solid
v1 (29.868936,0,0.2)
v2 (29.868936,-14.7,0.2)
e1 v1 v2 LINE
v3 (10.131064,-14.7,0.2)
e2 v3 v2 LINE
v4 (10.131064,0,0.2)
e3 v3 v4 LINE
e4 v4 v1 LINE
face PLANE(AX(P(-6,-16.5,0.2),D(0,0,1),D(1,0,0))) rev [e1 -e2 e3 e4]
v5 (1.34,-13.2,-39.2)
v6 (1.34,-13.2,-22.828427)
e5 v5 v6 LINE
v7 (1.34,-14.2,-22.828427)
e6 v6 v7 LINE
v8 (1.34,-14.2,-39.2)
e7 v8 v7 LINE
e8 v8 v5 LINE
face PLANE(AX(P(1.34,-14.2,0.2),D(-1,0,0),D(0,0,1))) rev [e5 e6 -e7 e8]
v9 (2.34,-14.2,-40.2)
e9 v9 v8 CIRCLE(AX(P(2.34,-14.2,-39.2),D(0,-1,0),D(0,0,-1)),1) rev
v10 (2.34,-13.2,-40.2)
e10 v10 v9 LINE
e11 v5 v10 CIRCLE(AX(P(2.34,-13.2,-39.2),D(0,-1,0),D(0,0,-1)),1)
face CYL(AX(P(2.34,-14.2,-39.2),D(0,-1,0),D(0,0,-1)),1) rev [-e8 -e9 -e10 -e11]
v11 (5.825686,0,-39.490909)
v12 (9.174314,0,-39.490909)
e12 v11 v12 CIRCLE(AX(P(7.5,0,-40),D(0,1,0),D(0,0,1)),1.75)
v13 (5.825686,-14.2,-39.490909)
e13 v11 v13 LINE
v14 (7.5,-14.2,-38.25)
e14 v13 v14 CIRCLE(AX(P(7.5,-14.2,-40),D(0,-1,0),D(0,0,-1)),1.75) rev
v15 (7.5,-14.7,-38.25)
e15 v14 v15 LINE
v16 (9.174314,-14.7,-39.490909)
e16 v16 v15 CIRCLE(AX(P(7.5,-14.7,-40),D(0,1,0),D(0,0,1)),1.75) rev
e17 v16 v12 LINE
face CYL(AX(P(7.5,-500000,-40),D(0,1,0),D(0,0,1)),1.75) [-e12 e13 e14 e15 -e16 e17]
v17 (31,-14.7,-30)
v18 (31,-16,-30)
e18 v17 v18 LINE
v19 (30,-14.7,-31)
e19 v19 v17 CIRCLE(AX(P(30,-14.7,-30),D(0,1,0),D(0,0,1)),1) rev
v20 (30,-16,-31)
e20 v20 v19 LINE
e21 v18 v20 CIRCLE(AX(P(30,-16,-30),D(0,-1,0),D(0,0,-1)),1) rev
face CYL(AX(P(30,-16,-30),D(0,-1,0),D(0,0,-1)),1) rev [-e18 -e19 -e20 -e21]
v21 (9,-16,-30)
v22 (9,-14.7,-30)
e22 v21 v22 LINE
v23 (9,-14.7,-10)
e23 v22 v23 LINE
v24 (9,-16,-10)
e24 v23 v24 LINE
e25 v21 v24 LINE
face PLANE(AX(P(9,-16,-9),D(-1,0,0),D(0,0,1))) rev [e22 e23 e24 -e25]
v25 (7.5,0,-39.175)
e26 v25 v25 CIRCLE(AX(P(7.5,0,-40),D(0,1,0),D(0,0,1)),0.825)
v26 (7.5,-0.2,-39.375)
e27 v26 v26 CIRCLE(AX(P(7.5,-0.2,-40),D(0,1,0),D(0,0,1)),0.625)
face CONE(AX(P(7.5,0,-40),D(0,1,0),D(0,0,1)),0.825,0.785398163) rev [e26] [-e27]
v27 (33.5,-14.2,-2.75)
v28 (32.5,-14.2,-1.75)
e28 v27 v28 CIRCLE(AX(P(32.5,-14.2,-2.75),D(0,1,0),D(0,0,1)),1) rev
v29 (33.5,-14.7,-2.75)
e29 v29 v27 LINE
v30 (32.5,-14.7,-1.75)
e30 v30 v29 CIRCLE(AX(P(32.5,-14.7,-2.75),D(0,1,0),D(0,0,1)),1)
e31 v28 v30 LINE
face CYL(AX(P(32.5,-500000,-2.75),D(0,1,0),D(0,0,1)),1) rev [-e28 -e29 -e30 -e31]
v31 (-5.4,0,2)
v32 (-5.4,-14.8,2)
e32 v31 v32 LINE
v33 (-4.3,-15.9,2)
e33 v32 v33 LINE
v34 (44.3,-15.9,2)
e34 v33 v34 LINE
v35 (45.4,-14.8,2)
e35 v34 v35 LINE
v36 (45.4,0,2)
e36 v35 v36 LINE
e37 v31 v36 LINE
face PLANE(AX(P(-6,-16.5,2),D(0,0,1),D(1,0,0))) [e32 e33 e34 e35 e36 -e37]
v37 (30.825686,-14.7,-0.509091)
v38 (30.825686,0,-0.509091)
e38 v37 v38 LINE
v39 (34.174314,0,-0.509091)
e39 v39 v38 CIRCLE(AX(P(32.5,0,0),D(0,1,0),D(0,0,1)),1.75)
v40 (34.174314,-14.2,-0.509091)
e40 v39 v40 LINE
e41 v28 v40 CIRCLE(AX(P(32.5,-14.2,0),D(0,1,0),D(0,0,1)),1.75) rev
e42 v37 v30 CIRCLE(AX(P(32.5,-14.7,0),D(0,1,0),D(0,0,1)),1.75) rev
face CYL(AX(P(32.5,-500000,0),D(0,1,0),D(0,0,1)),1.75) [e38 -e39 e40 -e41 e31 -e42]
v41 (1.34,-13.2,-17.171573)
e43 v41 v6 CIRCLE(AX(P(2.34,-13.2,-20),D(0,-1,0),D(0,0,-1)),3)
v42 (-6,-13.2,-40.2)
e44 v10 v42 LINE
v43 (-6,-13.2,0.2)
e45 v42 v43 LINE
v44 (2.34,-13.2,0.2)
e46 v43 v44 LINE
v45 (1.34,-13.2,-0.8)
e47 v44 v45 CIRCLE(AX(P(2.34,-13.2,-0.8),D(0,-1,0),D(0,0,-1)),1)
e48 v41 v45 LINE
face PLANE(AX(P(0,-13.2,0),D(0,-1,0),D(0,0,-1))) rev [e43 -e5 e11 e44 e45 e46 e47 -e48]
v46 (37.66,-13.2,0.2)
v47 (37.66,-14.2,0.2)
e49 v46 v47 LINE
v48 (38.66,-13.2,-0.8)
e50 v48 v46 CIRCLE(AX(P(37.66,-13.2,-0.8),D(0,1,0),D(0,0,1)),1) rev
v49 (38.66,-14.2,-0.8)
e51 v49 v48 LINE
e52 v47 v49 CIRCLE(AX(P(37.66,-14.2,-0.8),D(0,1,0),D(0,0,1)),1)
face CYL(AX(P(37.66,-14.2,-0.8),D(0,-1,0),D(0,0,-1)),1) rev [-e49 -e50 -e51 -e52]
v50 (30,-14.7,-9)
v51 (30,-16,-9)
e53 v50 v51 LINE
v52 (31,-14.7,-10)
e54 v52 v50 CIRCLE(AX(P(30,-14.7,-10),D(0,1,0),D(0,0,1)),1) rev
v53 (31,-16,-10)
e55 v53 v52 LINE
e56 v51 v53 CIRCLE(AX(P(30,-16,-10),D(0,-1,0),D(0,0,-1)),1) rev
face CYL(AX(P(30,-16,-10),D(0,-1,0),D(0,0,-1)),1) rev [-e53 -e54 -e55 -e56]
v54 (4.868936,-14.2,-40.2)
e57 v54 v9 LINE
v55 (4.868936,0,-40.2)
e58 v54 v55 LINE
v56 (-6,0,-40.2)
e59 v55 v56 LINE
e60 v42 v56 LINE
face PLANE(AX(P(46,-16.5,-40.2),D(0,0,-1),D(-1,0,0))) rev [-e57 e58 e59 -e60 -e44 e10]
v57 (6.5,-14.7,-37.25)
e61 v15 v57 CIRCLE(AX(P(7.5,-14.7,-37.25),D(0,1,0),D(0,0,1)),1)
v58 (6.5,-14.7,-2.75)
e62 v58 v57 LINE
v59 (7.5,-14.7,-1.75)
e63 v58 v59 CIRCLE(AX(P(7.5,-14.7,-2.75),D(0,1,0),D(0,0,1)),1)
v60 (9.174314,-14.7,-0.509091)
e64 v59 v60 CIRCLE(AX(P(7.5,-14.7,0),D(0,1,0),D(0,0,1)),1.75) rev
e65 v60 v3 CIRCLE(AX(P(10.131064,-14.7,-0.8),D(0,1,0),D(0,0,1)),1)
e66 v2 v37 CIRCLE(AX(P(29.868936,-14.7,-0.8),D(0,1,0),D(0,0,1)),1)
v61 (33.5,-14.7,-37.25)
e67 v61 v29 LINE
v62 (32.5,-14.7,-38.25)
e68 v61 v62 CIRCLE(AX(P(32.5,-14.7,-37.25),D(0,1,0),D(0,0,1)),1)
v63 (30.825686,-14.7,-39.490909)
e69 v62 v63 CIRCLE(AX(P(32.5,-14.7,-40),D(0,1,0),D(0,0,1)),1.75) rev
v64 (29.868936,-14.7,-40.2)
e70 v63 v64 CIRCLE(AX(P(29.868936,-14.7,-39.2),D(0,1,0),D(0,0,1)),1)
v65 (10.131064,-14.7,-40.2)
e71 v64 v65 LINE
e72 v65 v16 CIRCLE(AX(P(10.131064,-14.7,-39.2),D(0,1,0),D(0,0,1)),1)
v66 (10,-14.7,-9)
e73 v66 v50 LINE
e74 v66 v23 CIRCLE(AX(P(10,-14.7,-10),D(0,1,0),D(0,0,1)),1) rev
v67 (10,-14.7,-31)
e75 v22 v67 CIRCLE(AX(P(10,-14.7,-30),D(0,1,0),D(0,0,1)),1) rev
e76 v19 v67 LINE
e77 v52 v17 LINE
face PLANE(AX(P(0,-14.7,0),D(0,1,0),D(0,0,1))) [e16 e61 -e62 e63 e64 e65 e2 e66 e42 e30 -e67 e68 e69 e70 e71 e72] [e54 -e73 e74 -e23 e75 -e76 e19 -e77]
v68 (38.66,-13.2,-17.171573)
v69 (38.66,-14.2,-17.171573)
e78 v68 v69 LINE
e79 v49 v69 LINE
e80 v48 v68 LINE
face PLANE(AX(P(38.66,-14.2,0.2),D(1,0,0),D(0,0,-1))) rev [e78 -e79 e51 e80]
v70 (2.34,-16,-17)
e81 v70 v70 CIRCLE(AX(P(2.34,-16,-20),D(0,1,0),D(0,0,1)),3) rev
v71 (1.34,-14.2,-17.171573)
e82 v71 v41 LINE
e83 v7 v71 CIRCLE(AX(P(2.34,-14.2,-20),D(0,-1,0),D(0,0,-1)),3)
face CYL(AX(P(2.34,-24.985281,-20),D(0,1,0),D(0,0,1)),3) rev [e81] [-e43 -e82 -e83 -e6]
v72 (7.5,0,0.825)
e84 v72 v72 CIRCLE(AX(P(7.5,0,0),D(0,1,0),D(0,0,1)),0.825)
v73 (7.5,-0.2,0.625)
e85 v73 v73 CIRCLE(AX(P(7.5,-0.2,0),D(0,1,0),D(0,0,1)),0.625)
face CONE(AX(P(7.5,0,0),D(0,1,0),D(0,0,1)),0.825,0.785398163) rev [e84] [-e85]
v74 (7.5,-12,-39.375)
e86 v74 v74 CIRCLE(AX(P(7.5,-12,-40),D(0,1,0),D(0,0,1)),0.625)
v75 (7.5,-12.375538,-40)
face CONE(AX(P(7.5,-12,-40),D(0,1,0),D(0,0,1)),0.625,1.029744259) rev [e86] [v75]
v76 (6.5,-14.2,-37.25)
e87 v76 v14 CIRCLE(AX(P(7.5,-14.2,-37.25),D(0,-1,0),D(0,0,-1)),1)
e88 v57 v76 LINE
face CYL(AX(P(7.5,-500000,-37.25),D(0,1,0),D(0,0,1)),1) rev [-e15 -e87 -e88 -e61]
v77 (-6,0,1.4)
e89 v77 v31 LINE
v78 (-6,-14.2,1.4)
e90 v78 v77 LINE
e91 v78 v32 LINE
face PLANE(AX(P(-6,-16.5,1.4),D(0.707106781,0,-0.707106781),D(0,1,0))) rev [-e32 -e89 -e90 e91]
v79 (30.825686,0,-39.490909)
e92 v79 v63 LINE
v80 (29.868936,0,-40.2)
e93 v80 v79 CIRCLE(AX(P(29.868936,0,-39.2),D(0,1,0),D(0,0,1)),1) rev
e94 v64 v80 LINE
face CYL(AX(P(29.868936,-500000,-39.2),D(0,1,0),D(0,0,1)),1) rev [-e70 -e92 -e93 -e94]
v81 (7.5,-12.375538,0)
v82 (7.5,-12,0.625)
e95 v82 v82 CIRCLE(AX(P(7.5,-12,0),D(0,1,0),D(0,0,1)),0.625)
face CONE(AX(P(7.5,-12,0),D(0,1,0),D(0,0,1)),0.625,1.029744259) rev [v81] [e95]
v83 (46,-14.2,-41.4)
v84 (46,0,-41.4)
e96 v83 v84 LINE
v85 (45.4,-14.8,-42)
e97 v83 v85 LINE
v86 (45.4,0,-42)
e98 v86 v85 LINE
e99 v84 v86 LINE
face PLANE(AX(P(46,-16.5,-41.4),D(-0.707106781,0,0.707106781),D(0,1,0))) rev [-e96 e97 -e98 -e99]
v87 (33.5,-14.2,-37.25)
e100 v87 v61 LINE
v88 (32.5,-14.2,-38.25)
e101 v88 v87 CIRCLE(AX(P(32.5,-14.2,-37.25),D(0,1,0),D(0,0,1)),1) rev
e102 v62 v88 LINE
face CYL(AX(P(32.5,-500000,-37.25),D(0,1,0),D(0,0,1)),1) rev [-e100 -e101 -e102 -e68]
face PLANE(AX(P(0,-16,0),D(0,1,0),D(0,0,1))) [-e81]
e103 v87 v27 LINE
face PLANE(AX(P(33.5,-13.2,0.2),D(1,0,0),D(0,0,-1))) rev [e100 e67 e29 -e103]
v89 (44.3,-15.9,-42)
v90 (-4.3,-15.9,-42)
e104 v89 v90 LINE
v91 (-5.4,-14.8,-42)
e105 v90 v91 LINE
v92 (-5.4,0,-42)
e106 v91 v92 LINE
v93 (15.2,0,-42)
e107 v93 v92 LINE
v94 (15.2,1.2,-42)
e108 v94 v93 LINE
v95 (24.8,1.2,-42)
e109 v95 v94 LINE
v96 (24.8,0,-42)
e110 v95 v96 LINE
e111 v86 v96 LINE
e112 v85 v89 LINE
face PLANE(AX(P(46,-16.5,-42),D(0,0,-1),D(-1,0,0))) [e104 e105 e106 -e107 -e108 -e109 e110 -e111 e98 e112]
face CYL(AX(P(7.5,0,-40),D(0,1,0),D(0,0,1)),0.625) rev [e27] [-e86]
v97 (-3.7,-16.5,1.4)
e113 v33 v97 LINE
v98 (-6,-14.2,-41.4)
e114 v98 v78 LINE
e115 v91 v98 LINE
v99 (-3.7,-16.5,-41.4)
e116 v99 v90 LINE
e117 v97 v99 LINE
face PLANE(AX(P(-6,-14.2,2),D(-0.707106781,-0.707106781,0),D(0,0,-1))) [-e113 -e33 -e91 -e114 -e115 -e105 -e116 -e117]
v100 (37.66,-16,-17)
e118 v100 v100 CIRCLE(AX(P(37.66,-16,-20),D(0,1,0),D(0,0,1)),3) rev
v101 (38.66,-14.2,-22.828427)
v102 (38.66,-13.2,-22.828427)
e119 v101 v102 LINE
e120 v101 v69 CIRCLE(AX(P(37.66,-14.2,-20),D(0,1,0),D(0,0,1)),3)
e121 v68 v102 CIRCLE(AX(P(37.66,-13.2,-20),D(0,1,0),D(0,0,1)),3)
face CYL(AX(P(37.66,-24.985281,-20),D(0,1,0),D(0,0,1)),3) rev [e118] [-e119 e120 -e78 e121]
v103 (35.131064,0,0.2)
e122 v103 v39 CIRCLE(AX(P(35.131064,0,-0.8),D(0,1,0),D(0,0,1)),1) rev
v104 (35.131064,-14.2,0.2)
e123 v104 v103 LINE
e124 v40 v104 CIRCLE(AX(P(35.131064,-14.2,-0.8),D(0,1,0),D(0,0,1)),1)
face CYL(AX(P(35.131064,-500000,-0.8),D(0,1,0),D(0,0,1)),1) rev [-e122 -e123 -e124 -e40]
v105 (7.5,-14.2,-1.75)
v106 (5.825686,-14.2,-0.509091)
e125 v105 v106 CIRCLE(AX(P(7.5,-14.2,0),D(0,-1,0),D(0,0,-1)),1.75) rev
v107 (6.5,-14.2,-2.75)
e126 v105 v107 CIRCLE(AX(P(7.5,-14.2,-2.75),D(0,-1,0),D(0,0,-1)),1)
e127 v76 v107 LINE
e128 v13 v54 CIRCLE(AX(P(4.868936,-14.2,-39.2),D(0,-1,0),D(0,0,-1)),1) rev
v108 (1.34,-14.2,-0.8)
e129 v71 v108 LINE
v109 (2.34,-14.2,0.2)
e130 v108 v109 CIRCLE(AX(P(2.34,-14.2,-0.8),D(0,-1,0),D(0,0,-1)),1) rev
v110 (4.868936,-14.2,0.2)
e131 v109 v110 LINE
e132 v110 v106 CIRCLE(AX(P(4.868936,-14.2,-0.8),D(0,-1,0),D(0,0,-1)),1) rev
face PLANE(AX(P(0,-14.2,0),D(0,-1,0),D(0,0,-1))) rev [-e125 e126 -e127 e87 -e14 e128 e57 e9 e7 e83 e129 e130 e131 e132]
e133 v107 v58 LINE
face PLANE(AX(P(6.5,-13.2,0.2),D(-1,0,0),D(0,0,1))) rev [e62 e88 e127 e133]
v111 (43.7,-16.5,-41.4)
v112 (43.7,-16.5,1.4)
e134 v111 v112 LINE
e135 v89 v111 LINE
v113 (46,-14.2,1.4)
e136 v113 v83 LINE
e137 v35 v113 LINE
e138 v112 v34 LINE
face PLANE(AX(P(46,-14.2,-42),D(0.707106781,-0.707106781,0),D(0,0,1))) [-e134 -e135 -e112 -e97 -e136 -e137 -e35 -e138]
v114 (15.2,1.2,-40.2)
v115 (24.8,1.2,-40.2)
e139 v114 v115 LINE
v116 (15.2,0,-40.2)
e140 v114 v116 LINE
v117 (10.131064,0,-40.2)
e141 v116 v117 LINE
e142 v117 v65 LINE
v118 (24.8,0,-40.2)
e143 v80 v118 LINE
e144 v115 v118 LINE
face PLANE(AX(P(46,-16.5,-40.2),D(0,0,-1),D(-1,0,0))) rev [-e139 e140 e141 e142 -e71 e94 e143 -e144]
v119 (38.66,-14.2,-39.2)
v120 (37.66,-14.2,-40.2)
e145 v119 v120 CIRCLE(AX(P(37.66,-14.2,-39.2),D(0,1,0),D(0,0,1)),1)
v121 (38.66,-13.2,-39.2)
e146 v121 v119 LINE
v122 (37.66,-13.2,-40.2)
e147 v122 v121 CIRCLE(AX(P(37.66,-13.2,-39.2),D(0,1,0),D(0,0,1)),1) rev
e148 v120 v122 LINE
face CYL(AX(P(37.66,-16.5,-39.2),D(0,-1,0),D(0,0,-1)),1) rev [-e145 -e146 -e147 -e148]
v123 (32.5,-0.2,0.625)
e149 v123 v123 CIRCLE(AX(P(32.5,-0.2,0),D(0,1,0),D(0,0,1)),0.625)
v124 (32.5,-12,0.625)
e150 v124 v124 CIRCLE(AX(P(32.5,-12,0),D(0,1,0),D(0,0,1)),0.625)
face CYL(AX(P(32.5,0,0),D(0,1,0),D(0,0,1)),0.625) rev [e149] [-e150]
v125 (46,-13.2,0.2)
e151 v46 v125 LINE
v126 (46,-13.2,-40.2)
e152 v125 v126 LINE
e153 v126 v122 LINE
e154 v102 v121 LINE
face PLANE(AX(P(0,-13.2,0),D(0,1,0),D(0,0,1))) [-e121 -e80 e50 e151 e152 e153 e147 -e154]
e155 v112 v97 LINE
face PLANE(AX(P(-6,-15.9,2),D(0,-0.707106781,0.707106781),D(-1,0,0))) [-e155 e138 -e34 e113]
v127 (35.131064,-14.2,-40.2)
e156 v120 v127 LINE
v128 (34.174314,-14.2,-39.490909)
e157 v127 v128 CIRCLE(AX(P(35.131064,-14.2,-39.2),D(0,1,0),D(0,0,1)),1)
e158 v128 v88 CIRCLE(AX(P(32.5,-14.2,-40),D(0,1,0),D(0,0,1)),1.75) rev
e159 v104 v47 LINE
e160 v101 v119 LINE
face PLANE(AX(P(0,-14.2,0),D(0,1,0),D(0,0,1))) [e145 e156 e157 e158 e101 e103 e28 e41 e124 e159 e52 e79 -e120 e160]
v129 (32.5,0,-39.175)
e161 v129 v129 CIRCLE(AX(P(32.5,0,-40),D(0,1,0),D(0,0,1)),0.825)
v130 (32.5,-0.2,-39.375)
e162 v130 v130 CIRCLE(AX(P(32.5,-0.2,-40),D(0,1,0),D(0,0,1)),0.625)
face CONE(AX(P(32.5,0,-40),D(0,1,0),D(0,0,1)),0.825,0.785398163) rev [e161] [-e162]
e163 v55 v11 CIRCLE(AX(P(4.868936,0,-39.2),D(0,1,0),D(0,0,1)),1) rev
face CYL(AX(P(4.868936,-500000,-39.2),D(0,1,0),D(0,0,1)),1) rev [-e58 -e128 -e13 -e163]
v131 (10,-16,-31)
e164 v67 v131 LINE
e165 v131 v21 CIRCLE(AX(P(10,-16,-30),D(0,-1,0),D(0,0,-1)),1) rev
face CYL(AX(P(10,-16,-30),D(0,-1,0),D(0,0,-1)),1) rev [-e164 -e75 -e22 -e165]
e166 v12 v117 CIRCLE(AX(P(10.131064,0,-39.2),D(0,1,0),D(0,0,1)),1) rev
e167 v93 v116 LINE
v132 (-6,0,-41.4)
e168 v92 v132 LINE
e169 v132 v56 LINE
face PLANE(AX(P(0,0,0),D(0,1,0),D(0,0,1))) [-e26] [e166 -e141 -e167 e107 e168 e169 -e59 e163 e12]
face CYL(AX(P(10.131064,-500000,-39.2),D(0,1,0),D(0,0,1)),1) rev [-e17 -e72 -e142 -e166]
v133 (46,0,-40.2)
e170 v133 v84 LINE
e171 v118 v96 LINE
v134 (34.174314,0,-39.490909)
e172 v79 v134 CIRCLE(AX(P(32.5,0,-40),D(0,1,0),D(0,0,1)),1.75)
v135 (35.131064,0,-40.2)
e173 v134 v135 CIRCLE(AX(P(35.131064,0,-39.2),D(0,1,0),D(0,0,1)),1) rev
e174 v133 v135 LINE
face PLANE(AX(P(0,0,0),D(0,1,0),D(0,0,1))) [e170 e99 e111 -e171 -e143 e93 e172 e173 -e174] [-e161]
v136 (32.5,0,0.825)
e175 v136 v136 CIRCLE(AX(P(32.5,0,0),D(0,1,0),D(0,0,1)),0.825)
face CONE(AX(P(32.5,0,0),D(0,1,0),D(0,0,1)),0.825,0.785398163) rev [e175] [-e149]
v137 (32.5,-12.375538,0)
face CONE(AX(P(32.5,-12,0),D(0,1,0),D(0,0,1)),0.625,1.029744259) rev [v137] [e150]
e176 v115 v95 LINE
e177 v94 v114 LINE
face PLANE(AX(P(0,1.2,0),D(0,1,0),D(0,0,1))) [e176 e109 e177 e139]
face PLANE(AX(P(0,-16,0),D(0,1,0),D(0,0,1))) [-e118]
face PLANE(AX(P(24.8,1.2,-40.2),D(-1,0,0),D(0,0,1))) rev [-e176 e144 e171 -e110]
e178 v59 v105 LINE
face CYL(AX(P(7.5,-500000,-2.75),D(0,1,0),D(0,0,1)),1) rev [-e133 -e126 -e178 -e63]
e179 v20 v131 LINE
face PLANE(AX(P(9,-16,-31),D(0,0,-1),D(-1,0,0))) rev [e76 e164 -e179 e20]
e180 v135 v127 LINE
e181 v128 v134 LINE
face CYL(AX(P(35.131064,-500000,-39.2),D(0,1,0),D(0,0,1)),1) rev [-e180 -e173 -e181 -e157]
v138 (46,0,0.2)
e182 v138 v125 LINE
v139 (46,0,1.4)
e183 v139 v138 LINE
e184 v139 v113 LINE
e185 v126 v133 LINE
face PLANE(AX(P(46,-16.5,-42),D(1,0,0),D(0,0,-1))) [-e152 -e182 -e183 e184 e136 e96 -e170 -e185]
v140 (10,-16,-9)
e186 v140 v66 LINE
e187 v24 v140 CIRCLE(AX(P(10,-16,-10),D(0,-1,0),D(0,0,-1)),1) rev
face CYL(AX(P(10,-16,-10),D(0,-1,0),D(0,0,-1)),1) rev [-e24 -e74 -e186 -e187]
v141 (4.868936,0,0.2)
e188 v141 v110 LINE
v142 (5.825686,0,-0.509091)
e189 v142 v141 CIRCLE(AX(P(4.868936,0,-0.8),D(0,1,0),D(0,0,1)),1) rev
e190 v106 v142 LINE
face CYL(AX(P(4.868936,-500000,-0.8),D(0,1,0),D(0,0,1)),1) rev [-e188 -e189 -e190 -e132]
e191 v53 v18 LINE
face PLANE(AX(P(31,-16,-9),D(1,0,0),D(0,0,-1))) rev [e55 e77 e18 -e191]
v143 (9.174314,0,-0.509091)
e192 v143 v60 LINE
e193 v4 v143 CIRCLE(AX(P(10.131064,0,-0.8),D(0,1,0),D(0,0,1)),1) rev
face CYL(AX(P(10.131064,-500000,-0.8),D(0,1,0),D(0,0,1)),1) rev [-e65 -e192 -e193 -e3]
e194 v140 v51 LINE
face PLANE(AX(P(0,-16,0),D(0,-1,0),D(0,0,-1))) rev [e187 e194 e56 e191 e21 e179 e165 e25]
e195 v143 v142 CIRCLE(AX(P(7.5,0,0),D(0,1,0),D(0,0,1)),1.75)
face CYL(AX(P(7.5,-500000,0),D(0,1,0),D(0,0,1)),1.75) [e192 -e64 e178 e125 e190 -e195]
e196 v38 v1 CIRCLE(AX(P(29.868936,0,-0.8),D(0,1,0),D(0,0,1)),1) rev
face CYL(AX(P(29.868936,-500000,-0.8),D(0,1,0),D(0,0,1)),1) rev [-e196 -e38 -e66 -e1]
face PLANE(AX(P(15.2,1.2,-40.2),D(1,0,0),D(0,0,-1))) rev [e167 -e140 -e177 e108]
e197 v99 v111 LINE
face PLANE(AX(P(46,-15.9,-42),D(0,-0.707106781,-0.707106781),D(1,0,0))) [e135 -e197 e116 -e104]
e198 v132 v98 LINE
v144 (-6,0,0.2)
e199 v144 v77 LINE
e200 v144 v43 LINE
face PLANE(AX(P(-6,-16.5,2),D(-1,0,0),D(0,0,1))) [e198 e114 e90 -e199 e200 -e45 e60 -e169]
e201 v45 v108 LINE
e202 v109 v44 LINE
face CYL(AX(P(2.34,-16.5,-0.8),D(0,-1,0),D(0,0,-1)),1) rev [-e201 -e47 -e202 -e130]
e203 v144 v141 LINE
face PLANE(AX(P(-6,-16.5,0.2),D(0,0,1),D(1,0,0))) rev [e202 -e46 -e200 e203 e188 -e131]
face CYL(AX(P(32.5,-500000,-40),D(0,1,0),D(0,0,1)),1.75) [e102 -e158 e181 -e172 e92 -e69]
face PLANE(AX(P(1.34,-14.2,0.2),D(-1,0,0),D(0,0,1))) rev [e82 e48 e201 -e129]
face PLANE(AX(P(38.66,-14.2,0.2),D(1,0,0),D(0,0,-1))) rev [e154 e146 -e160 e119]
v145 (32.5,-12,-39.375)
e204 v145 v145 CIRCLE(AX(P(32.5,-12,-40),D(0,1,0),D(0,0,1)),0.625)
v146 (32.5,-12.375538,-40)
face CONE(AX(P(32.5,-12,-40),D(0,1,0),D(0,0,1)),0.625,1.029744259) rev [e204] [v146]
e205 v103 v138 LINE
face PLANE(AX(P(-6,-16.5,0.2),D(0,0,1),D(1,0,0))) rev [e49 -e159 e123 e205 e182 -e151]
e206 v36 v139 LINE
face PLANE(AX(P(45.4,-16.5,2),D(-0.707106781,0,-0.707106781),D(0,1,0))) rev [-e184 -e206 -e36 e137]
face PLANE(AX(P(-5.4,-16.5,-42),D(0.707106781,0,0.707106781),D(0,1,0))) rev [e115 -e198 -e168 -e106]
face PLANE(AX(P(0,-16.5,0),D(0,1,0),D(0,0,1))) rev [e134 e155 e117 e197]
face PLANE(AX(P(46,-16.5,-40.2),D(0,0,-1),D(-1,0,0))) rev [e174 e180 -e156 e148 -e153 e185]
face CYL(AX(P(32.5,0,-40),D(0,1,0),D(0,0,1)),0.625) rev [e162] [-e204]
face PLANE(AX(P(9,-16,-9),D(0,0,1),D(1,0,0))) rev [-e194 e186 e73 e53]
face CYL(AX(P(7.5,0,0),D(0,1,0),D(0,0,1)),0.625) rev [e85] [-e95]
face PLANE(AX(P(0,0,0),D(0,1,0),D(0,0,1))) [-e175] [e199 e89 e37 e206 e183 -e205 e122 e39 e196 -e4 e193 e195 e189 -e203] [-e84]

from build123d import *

# Parameters (mm, degrees)
SKETCH_1_W                     = 52
SKETCH_1_H                     = 44
EXTRUDE_1_DEPTH                = 16.5
SHELL_1_T                      = -1.8
CUT_EXTRUDE_1_DEPTH            = 68.500296296
CUT_EXTRUDE_1_DEPTH_BACK       = 68.500296296
SKETCH_3_W                     = 40.4
SKETCH_3_H                     = 14.7
SKETCH_4_W                     = 12.5
SKETCH_4_H                     = 40.4
EXTRUDE_2_DEPTH                = 1.5
CUT_EXTRUDE_2_DEPTH            = 1
EXTRUDE_3_REACH                = 66.438
SKETCH_6_R                     = 1.75
HOLE_WIZARD_M1_6_1_D           = 1.25
HOLE_WIZARD_M1_6_1_DEPTH       = 12
HOLE_WIZARD_M1_6_1_CSINK_D     = 1.65
HOLE_WIZARD_M1_6_1_CSINK_ANGLE = 90
HOLE_WIZARD_M1_6_1_TIP         = 0.375537887
SKETCH_11_W                    = 22
SKETCH_11_H                    = 22
CUT_EXTRUDE_3_DEPTH            = 1.3
CHAMFER_2_SIZE                 = 0.6
FILLET_1_R                     = 1
SKETCH_13_W                    = 9.6
SKETCH_13_H                    = 1.8
EXTRUDE_4_DEPTH                = 1.2
CHAMFER_3_SIZE                 = 2.3
SKETCH_14_R                    = 3
CUT_EXTRUDE_5_DEPTH            = 16


with BuildPart() as part:
    # 스케치1 → 보스-돌출1 (new body)
    with BuildSketch(Plane(origin=(0, 0, 0), x_dir=(1, 0, 0), z_dir=(0, 1, 0))):
        with Locations((20, 20)):
            Rectangle(SKETCH_1_W, SKETCH_1_H)
    extrude(amount=-EXTRUDE_1_DEPTH)

    # 쉘1
    shell_1_openings = [part.faces().sort_by_distance(p)[0] for p in [
        (20, 0, -20),
    ]]
    offset(amount=SHELL_1_T, openings=shell_1_openings, kind=Kind.INTERSECTION)

    # 스케치3 → 컷-돌출1 (cut, two sides: drawn at the far end of the back side and taken through both)
    with BuildSketch(Plane(origin=(-4.2, 0, 0), x_dir=(0, 0, -1), z_dir=(1, 0, 0)).offset(-CUT_EXTRUDE_1_DEPTH_BACK)):
        with Locations((20, -7.35)):
            Rectangle(SKETCH_3_W, SKETCH_3_H)
    extrude(amount=CUT_EXTRUDE_1_DEPTH + CUT_EXTRUDE_1_DEPTH_BACK, mode=Mode.SUBTRACT)

    # 스케치4 → 보스-돌출2 (add)
    with BuildSketch(Plane(origin=(0, -14.7, 0), x_dir=(1, 0, 0), z_dir=(0, 1, 0))):
        with Locations((39.75, 20)):
            Rectangle(SKETCH_4_W, SKETCH_4_H)
        with Locations((0.25, 20)):
            Rectangle(SKETCH_4_W, SKETCH_4_H)
    extrude(amount=EXTRUDE_2_DEPTH)

    # 스케치5 → 컷-돌출2 (cut)
    with BuildSketch(Plane(origin=(0, -13.2, 0), x_dir=(1, 0, 0), z_dir=(0, 1, 0))):
        Polygon((2.34, -0.2), (1.34, -0.2), (1.34, 40.2), (2.34, 40.2), (4.34, 40.2), (9.34, 40.2), (9.34, -0.2), (4.34, -0.2), align=None)
        Polygon((35.66, 40.2), (37.66, 40.2), (38.66, 40.2), (38.66, -0.2), (37.66, -0.2), (35.66, -0.2), (30.66, -0.2), (30.66, 40.2), align=None)
    extrude(amount=-CUT_EXTRUDE_2_DEPTH, mode=Mode.SUBTRACT)

    # 스케치6 → 보스-돌출3 (add, up to next)
    with BuildSketch(Plane(origin=(0, 0, 0), x_dir=(1, 0, 0), z_dir=(0, 1, 0)), mode=Mode.PRIVATE) as extrude_3_sk1:
        with Locations((7.5, 0)):
            Circle(SKETCH_6_R)
    extrude_3_tool1 = extrude(extrude_3_sk1.sketch, amount=-EXTRUDE_3_REACH, mode=Mode.PRIVATE) - part.part
    # 스케치6 → 보스-돌출3 (add, up to next)
    with BuildSketch(Plane(origin=(0, 0, 0), x_dir=(1, 0, 0), z_dir=(0, 1, 0)), mode=Mode.PRIVATE) as extrude_3_sk2:
        with Locations((7.5, 40)):
            Circle(SKETCH_6_R)
    extrude_3_tool2 = extrude(extrude_3_sk2.sketch, amount=-EXTRUDE_3_REACH, mode=Mode.PRIVATE) - part.part
    # 스케치6 → 보스-돌출3 (add, up to next)
    with BuildSketch(Plane(origin=(0, 0, 0), x_dir=(1, 0, 0), z_dir=(0, 1, 0)), mode=Mode.PRIVATE) as extrude_3_sk3:
        with Locations((32.5, 40)):
            Circle(SKETCH_6_R)
    extrude_3_tool3 = extrude(extrude_3_sk3.sketch, amount=-EXTRUDE_3_REACH, mode=Mode.PRIVATE) - part.part
    # 스케치6 → 보스-돌출3 (add, up to next)
    with BuildSketch(Plane(origin=(0, 0, 0), x_dir=(1, 0, 0), z_dir=(0, 1, 0)), mode=Mode.PRIVATE) as extrude_3_sk4:
        with Locations((32.5, 0)):
            Circle(SKETCH_6_R)
    extrude_3_tool4 = extrude(extrude_3_sk4.sketch, amount=-EXTRUDE_3_REACH, mode=Mode.PRIVATE) - part.part
    add(extrude_3_tool1.solids().sort_by_distance((7.5, 0, 0))[0])
    add(extrude_3_tool2.solids().sort_by_distance((7.5, 0, -40))[0])
    add(extrude_3_tool3.solids().sort_by_distance((32.5, 0, -40))[0])
    add(extrude_3_tool4.solids().sort_by_distance((32.5, 0, 0))[0])

    # M1.6 나사 구멍1
    with Locations(Plane(origin=(0, 0, 0), x_dir=(1, 0, 0), z_dir=(0, 1, 0))):
        with Locations((7.5, 0), (32.5, 0), (7.5, 40), (32.5, 40)):
            CounterSinkHole(HOLE_WIZARD_M1_6_1_D / 2, HOLE_WIZARD_M1_6_1_CSINK_D / 2, depth=HOLE_WIZARD_M1_6_1_DEPTH, counter_sink_angle=HOLE_WIZARD_M1_6_1_CSINK_ANGLE)
            with Locations((0, 0, -(HOLE_WIZARD_M1_6_1_DEPTH + HOLE_WIZARD_M1_6_1_TIP / 2))):  # 118° drill point
                Cone(0, HOLE_WIZARD_M1_6_1_D / 2, HOLE_WIZARD_M1_6_1_TIP, mode=Mode.SUBTRACT)

    # 스케치11 → 컷-돌출3 (cut)
    with BuildSketch(Plane(origin=(0, -14.7, 0), x_dir=(1, 0, 0), z_dir=(0, 1, 0))):
        with Locations((20, 20)):
            Rectangle(SKETCH_11_W, SKETCH_11_H)
    extrude(amount=-CUT_EXTRUDE_3_DEPTH, mode=Mode.SUBTRACT)

    # 모따기2
    chamfer_2_edges = [part.edges().sort_by_distance(p)[0] for p in [
        (20, -16.5, -42),
        (20, -16.5, 2),
        (-6, -8.25, -42),
        (46, -8.25, -42),
        (46, -8.25, 2),
        (-6, -8.25, 2),
    ]]
    chamfer(chamfer_2_edges, length=CHAMFER_2_SIZE)

    # 필렛1
    fillet_1_edges = [part.edges().sort_by_distance(p)[0] for p in [
        (38.66, -13.7, 0.2),
        (38.66, -13.7, -40.2),
        (9.238533865, -7.35, 0.2),
        (6.5, -14.45, -1.436140662),
        (5.761466135, -7.1, 0.2),
        (5.761466135, -7.1, -40.2),
        (6.5, -14.45, -38.563859338),
        (9.238533865, -7.35, -40.2),
        (30.761466135, -7.35, -40.2),
        (33.5, -14.45, -38.563859338),
        (34.238533865, -7.1, -40.2),
        (34.238533865, -7.1, 0.2),
        (33.5, -14.45, -1.436140662),
        (30.761466135, -7.35, 0.2),
        (9, -15.35, -9),
        (9, -15.35, -31),
        (31, -15.35, -31),
        (31, -15.35, -9),
        (1.34, -13.7, -40.2),
        (1.34, -13.7, 0.2),
    ]]
    fillet(fillet_1_edges, radius=FILLET_1_R)

    # 스케치13 → 보스-돌출4 (add)
    with BuildSketch(Plane(origin=(0, 0, 0), x_dir=(1, 0, 0), z_dir=(0, 1, 0))):
        with Locations((20, 41.1)):
            Rectangle(SKETCH_13_W, SKETCH_13_H)
    extrude(amount=EXTRUDE_4_DEPTH)

    # 모따기3
    # the kernel refuses this chamfer: 2.3 mm, written as the material it takes off along each edge
    with BuildSketch(Plane(origin=(46, -16.5, 7.314870872), x_dir=(0.027495876610586976, 0.9996219169112968, 0), z_dir=(0, 0, -1))) as chamfer_3_piece_1:
        Polygon((CHAMFER_3_SIZE * 0.999621916911, -CHAMFER_3_SIZE * 0.0274958766106), (-CHAMFER_3_SIZE * 0.0274958766106, -CHAMFER_3_SIZE * 0.999621916911), (0, 0), align=None)
    extrude(amount=54.629741745, mode=Mode.SUBTRACT)
    with BuildSketch(Plane(origin=(-6, -16.5, -47.314870872), x_dir=(0.9996219169112966, -0.027495876610586965, 0), z_dir=(0, 0, 1))) as chamfer_3_piece_2:
        Polygon((CHAMFER_3_SIZE * 0.999621916911, CHAMFER_3_SIZE * 0.0274958766106), (-CHAMFER_3_SIZE * 0.0274958766106, CHAMFER_3_SIZE * 0.999621916911), (0, 0), align=None)
    extrude(amount=54.629741745, mode=Mode.SUBTRACT)

    # 스케치14 → 컷-돌출5 (cut)
    with BuildSketch(Plane(origin=(0, 0, 0), x_dir=(1, 0, 0), z_dir=(0, 1, 0))):
        with Locations(Location((2.34, 20, 0), (0, 0, 270))):
            Circle(SKETCH_14_R)
        with Locations(Location((37.66, 20, 0), (0, 0, 270))):
            Circle(SKETCH_14_R)
    extrude(amount=-CUT_EXTRUDE_5_DEPTH, mode=Mode.SUBTRACT)


solid = part.part
